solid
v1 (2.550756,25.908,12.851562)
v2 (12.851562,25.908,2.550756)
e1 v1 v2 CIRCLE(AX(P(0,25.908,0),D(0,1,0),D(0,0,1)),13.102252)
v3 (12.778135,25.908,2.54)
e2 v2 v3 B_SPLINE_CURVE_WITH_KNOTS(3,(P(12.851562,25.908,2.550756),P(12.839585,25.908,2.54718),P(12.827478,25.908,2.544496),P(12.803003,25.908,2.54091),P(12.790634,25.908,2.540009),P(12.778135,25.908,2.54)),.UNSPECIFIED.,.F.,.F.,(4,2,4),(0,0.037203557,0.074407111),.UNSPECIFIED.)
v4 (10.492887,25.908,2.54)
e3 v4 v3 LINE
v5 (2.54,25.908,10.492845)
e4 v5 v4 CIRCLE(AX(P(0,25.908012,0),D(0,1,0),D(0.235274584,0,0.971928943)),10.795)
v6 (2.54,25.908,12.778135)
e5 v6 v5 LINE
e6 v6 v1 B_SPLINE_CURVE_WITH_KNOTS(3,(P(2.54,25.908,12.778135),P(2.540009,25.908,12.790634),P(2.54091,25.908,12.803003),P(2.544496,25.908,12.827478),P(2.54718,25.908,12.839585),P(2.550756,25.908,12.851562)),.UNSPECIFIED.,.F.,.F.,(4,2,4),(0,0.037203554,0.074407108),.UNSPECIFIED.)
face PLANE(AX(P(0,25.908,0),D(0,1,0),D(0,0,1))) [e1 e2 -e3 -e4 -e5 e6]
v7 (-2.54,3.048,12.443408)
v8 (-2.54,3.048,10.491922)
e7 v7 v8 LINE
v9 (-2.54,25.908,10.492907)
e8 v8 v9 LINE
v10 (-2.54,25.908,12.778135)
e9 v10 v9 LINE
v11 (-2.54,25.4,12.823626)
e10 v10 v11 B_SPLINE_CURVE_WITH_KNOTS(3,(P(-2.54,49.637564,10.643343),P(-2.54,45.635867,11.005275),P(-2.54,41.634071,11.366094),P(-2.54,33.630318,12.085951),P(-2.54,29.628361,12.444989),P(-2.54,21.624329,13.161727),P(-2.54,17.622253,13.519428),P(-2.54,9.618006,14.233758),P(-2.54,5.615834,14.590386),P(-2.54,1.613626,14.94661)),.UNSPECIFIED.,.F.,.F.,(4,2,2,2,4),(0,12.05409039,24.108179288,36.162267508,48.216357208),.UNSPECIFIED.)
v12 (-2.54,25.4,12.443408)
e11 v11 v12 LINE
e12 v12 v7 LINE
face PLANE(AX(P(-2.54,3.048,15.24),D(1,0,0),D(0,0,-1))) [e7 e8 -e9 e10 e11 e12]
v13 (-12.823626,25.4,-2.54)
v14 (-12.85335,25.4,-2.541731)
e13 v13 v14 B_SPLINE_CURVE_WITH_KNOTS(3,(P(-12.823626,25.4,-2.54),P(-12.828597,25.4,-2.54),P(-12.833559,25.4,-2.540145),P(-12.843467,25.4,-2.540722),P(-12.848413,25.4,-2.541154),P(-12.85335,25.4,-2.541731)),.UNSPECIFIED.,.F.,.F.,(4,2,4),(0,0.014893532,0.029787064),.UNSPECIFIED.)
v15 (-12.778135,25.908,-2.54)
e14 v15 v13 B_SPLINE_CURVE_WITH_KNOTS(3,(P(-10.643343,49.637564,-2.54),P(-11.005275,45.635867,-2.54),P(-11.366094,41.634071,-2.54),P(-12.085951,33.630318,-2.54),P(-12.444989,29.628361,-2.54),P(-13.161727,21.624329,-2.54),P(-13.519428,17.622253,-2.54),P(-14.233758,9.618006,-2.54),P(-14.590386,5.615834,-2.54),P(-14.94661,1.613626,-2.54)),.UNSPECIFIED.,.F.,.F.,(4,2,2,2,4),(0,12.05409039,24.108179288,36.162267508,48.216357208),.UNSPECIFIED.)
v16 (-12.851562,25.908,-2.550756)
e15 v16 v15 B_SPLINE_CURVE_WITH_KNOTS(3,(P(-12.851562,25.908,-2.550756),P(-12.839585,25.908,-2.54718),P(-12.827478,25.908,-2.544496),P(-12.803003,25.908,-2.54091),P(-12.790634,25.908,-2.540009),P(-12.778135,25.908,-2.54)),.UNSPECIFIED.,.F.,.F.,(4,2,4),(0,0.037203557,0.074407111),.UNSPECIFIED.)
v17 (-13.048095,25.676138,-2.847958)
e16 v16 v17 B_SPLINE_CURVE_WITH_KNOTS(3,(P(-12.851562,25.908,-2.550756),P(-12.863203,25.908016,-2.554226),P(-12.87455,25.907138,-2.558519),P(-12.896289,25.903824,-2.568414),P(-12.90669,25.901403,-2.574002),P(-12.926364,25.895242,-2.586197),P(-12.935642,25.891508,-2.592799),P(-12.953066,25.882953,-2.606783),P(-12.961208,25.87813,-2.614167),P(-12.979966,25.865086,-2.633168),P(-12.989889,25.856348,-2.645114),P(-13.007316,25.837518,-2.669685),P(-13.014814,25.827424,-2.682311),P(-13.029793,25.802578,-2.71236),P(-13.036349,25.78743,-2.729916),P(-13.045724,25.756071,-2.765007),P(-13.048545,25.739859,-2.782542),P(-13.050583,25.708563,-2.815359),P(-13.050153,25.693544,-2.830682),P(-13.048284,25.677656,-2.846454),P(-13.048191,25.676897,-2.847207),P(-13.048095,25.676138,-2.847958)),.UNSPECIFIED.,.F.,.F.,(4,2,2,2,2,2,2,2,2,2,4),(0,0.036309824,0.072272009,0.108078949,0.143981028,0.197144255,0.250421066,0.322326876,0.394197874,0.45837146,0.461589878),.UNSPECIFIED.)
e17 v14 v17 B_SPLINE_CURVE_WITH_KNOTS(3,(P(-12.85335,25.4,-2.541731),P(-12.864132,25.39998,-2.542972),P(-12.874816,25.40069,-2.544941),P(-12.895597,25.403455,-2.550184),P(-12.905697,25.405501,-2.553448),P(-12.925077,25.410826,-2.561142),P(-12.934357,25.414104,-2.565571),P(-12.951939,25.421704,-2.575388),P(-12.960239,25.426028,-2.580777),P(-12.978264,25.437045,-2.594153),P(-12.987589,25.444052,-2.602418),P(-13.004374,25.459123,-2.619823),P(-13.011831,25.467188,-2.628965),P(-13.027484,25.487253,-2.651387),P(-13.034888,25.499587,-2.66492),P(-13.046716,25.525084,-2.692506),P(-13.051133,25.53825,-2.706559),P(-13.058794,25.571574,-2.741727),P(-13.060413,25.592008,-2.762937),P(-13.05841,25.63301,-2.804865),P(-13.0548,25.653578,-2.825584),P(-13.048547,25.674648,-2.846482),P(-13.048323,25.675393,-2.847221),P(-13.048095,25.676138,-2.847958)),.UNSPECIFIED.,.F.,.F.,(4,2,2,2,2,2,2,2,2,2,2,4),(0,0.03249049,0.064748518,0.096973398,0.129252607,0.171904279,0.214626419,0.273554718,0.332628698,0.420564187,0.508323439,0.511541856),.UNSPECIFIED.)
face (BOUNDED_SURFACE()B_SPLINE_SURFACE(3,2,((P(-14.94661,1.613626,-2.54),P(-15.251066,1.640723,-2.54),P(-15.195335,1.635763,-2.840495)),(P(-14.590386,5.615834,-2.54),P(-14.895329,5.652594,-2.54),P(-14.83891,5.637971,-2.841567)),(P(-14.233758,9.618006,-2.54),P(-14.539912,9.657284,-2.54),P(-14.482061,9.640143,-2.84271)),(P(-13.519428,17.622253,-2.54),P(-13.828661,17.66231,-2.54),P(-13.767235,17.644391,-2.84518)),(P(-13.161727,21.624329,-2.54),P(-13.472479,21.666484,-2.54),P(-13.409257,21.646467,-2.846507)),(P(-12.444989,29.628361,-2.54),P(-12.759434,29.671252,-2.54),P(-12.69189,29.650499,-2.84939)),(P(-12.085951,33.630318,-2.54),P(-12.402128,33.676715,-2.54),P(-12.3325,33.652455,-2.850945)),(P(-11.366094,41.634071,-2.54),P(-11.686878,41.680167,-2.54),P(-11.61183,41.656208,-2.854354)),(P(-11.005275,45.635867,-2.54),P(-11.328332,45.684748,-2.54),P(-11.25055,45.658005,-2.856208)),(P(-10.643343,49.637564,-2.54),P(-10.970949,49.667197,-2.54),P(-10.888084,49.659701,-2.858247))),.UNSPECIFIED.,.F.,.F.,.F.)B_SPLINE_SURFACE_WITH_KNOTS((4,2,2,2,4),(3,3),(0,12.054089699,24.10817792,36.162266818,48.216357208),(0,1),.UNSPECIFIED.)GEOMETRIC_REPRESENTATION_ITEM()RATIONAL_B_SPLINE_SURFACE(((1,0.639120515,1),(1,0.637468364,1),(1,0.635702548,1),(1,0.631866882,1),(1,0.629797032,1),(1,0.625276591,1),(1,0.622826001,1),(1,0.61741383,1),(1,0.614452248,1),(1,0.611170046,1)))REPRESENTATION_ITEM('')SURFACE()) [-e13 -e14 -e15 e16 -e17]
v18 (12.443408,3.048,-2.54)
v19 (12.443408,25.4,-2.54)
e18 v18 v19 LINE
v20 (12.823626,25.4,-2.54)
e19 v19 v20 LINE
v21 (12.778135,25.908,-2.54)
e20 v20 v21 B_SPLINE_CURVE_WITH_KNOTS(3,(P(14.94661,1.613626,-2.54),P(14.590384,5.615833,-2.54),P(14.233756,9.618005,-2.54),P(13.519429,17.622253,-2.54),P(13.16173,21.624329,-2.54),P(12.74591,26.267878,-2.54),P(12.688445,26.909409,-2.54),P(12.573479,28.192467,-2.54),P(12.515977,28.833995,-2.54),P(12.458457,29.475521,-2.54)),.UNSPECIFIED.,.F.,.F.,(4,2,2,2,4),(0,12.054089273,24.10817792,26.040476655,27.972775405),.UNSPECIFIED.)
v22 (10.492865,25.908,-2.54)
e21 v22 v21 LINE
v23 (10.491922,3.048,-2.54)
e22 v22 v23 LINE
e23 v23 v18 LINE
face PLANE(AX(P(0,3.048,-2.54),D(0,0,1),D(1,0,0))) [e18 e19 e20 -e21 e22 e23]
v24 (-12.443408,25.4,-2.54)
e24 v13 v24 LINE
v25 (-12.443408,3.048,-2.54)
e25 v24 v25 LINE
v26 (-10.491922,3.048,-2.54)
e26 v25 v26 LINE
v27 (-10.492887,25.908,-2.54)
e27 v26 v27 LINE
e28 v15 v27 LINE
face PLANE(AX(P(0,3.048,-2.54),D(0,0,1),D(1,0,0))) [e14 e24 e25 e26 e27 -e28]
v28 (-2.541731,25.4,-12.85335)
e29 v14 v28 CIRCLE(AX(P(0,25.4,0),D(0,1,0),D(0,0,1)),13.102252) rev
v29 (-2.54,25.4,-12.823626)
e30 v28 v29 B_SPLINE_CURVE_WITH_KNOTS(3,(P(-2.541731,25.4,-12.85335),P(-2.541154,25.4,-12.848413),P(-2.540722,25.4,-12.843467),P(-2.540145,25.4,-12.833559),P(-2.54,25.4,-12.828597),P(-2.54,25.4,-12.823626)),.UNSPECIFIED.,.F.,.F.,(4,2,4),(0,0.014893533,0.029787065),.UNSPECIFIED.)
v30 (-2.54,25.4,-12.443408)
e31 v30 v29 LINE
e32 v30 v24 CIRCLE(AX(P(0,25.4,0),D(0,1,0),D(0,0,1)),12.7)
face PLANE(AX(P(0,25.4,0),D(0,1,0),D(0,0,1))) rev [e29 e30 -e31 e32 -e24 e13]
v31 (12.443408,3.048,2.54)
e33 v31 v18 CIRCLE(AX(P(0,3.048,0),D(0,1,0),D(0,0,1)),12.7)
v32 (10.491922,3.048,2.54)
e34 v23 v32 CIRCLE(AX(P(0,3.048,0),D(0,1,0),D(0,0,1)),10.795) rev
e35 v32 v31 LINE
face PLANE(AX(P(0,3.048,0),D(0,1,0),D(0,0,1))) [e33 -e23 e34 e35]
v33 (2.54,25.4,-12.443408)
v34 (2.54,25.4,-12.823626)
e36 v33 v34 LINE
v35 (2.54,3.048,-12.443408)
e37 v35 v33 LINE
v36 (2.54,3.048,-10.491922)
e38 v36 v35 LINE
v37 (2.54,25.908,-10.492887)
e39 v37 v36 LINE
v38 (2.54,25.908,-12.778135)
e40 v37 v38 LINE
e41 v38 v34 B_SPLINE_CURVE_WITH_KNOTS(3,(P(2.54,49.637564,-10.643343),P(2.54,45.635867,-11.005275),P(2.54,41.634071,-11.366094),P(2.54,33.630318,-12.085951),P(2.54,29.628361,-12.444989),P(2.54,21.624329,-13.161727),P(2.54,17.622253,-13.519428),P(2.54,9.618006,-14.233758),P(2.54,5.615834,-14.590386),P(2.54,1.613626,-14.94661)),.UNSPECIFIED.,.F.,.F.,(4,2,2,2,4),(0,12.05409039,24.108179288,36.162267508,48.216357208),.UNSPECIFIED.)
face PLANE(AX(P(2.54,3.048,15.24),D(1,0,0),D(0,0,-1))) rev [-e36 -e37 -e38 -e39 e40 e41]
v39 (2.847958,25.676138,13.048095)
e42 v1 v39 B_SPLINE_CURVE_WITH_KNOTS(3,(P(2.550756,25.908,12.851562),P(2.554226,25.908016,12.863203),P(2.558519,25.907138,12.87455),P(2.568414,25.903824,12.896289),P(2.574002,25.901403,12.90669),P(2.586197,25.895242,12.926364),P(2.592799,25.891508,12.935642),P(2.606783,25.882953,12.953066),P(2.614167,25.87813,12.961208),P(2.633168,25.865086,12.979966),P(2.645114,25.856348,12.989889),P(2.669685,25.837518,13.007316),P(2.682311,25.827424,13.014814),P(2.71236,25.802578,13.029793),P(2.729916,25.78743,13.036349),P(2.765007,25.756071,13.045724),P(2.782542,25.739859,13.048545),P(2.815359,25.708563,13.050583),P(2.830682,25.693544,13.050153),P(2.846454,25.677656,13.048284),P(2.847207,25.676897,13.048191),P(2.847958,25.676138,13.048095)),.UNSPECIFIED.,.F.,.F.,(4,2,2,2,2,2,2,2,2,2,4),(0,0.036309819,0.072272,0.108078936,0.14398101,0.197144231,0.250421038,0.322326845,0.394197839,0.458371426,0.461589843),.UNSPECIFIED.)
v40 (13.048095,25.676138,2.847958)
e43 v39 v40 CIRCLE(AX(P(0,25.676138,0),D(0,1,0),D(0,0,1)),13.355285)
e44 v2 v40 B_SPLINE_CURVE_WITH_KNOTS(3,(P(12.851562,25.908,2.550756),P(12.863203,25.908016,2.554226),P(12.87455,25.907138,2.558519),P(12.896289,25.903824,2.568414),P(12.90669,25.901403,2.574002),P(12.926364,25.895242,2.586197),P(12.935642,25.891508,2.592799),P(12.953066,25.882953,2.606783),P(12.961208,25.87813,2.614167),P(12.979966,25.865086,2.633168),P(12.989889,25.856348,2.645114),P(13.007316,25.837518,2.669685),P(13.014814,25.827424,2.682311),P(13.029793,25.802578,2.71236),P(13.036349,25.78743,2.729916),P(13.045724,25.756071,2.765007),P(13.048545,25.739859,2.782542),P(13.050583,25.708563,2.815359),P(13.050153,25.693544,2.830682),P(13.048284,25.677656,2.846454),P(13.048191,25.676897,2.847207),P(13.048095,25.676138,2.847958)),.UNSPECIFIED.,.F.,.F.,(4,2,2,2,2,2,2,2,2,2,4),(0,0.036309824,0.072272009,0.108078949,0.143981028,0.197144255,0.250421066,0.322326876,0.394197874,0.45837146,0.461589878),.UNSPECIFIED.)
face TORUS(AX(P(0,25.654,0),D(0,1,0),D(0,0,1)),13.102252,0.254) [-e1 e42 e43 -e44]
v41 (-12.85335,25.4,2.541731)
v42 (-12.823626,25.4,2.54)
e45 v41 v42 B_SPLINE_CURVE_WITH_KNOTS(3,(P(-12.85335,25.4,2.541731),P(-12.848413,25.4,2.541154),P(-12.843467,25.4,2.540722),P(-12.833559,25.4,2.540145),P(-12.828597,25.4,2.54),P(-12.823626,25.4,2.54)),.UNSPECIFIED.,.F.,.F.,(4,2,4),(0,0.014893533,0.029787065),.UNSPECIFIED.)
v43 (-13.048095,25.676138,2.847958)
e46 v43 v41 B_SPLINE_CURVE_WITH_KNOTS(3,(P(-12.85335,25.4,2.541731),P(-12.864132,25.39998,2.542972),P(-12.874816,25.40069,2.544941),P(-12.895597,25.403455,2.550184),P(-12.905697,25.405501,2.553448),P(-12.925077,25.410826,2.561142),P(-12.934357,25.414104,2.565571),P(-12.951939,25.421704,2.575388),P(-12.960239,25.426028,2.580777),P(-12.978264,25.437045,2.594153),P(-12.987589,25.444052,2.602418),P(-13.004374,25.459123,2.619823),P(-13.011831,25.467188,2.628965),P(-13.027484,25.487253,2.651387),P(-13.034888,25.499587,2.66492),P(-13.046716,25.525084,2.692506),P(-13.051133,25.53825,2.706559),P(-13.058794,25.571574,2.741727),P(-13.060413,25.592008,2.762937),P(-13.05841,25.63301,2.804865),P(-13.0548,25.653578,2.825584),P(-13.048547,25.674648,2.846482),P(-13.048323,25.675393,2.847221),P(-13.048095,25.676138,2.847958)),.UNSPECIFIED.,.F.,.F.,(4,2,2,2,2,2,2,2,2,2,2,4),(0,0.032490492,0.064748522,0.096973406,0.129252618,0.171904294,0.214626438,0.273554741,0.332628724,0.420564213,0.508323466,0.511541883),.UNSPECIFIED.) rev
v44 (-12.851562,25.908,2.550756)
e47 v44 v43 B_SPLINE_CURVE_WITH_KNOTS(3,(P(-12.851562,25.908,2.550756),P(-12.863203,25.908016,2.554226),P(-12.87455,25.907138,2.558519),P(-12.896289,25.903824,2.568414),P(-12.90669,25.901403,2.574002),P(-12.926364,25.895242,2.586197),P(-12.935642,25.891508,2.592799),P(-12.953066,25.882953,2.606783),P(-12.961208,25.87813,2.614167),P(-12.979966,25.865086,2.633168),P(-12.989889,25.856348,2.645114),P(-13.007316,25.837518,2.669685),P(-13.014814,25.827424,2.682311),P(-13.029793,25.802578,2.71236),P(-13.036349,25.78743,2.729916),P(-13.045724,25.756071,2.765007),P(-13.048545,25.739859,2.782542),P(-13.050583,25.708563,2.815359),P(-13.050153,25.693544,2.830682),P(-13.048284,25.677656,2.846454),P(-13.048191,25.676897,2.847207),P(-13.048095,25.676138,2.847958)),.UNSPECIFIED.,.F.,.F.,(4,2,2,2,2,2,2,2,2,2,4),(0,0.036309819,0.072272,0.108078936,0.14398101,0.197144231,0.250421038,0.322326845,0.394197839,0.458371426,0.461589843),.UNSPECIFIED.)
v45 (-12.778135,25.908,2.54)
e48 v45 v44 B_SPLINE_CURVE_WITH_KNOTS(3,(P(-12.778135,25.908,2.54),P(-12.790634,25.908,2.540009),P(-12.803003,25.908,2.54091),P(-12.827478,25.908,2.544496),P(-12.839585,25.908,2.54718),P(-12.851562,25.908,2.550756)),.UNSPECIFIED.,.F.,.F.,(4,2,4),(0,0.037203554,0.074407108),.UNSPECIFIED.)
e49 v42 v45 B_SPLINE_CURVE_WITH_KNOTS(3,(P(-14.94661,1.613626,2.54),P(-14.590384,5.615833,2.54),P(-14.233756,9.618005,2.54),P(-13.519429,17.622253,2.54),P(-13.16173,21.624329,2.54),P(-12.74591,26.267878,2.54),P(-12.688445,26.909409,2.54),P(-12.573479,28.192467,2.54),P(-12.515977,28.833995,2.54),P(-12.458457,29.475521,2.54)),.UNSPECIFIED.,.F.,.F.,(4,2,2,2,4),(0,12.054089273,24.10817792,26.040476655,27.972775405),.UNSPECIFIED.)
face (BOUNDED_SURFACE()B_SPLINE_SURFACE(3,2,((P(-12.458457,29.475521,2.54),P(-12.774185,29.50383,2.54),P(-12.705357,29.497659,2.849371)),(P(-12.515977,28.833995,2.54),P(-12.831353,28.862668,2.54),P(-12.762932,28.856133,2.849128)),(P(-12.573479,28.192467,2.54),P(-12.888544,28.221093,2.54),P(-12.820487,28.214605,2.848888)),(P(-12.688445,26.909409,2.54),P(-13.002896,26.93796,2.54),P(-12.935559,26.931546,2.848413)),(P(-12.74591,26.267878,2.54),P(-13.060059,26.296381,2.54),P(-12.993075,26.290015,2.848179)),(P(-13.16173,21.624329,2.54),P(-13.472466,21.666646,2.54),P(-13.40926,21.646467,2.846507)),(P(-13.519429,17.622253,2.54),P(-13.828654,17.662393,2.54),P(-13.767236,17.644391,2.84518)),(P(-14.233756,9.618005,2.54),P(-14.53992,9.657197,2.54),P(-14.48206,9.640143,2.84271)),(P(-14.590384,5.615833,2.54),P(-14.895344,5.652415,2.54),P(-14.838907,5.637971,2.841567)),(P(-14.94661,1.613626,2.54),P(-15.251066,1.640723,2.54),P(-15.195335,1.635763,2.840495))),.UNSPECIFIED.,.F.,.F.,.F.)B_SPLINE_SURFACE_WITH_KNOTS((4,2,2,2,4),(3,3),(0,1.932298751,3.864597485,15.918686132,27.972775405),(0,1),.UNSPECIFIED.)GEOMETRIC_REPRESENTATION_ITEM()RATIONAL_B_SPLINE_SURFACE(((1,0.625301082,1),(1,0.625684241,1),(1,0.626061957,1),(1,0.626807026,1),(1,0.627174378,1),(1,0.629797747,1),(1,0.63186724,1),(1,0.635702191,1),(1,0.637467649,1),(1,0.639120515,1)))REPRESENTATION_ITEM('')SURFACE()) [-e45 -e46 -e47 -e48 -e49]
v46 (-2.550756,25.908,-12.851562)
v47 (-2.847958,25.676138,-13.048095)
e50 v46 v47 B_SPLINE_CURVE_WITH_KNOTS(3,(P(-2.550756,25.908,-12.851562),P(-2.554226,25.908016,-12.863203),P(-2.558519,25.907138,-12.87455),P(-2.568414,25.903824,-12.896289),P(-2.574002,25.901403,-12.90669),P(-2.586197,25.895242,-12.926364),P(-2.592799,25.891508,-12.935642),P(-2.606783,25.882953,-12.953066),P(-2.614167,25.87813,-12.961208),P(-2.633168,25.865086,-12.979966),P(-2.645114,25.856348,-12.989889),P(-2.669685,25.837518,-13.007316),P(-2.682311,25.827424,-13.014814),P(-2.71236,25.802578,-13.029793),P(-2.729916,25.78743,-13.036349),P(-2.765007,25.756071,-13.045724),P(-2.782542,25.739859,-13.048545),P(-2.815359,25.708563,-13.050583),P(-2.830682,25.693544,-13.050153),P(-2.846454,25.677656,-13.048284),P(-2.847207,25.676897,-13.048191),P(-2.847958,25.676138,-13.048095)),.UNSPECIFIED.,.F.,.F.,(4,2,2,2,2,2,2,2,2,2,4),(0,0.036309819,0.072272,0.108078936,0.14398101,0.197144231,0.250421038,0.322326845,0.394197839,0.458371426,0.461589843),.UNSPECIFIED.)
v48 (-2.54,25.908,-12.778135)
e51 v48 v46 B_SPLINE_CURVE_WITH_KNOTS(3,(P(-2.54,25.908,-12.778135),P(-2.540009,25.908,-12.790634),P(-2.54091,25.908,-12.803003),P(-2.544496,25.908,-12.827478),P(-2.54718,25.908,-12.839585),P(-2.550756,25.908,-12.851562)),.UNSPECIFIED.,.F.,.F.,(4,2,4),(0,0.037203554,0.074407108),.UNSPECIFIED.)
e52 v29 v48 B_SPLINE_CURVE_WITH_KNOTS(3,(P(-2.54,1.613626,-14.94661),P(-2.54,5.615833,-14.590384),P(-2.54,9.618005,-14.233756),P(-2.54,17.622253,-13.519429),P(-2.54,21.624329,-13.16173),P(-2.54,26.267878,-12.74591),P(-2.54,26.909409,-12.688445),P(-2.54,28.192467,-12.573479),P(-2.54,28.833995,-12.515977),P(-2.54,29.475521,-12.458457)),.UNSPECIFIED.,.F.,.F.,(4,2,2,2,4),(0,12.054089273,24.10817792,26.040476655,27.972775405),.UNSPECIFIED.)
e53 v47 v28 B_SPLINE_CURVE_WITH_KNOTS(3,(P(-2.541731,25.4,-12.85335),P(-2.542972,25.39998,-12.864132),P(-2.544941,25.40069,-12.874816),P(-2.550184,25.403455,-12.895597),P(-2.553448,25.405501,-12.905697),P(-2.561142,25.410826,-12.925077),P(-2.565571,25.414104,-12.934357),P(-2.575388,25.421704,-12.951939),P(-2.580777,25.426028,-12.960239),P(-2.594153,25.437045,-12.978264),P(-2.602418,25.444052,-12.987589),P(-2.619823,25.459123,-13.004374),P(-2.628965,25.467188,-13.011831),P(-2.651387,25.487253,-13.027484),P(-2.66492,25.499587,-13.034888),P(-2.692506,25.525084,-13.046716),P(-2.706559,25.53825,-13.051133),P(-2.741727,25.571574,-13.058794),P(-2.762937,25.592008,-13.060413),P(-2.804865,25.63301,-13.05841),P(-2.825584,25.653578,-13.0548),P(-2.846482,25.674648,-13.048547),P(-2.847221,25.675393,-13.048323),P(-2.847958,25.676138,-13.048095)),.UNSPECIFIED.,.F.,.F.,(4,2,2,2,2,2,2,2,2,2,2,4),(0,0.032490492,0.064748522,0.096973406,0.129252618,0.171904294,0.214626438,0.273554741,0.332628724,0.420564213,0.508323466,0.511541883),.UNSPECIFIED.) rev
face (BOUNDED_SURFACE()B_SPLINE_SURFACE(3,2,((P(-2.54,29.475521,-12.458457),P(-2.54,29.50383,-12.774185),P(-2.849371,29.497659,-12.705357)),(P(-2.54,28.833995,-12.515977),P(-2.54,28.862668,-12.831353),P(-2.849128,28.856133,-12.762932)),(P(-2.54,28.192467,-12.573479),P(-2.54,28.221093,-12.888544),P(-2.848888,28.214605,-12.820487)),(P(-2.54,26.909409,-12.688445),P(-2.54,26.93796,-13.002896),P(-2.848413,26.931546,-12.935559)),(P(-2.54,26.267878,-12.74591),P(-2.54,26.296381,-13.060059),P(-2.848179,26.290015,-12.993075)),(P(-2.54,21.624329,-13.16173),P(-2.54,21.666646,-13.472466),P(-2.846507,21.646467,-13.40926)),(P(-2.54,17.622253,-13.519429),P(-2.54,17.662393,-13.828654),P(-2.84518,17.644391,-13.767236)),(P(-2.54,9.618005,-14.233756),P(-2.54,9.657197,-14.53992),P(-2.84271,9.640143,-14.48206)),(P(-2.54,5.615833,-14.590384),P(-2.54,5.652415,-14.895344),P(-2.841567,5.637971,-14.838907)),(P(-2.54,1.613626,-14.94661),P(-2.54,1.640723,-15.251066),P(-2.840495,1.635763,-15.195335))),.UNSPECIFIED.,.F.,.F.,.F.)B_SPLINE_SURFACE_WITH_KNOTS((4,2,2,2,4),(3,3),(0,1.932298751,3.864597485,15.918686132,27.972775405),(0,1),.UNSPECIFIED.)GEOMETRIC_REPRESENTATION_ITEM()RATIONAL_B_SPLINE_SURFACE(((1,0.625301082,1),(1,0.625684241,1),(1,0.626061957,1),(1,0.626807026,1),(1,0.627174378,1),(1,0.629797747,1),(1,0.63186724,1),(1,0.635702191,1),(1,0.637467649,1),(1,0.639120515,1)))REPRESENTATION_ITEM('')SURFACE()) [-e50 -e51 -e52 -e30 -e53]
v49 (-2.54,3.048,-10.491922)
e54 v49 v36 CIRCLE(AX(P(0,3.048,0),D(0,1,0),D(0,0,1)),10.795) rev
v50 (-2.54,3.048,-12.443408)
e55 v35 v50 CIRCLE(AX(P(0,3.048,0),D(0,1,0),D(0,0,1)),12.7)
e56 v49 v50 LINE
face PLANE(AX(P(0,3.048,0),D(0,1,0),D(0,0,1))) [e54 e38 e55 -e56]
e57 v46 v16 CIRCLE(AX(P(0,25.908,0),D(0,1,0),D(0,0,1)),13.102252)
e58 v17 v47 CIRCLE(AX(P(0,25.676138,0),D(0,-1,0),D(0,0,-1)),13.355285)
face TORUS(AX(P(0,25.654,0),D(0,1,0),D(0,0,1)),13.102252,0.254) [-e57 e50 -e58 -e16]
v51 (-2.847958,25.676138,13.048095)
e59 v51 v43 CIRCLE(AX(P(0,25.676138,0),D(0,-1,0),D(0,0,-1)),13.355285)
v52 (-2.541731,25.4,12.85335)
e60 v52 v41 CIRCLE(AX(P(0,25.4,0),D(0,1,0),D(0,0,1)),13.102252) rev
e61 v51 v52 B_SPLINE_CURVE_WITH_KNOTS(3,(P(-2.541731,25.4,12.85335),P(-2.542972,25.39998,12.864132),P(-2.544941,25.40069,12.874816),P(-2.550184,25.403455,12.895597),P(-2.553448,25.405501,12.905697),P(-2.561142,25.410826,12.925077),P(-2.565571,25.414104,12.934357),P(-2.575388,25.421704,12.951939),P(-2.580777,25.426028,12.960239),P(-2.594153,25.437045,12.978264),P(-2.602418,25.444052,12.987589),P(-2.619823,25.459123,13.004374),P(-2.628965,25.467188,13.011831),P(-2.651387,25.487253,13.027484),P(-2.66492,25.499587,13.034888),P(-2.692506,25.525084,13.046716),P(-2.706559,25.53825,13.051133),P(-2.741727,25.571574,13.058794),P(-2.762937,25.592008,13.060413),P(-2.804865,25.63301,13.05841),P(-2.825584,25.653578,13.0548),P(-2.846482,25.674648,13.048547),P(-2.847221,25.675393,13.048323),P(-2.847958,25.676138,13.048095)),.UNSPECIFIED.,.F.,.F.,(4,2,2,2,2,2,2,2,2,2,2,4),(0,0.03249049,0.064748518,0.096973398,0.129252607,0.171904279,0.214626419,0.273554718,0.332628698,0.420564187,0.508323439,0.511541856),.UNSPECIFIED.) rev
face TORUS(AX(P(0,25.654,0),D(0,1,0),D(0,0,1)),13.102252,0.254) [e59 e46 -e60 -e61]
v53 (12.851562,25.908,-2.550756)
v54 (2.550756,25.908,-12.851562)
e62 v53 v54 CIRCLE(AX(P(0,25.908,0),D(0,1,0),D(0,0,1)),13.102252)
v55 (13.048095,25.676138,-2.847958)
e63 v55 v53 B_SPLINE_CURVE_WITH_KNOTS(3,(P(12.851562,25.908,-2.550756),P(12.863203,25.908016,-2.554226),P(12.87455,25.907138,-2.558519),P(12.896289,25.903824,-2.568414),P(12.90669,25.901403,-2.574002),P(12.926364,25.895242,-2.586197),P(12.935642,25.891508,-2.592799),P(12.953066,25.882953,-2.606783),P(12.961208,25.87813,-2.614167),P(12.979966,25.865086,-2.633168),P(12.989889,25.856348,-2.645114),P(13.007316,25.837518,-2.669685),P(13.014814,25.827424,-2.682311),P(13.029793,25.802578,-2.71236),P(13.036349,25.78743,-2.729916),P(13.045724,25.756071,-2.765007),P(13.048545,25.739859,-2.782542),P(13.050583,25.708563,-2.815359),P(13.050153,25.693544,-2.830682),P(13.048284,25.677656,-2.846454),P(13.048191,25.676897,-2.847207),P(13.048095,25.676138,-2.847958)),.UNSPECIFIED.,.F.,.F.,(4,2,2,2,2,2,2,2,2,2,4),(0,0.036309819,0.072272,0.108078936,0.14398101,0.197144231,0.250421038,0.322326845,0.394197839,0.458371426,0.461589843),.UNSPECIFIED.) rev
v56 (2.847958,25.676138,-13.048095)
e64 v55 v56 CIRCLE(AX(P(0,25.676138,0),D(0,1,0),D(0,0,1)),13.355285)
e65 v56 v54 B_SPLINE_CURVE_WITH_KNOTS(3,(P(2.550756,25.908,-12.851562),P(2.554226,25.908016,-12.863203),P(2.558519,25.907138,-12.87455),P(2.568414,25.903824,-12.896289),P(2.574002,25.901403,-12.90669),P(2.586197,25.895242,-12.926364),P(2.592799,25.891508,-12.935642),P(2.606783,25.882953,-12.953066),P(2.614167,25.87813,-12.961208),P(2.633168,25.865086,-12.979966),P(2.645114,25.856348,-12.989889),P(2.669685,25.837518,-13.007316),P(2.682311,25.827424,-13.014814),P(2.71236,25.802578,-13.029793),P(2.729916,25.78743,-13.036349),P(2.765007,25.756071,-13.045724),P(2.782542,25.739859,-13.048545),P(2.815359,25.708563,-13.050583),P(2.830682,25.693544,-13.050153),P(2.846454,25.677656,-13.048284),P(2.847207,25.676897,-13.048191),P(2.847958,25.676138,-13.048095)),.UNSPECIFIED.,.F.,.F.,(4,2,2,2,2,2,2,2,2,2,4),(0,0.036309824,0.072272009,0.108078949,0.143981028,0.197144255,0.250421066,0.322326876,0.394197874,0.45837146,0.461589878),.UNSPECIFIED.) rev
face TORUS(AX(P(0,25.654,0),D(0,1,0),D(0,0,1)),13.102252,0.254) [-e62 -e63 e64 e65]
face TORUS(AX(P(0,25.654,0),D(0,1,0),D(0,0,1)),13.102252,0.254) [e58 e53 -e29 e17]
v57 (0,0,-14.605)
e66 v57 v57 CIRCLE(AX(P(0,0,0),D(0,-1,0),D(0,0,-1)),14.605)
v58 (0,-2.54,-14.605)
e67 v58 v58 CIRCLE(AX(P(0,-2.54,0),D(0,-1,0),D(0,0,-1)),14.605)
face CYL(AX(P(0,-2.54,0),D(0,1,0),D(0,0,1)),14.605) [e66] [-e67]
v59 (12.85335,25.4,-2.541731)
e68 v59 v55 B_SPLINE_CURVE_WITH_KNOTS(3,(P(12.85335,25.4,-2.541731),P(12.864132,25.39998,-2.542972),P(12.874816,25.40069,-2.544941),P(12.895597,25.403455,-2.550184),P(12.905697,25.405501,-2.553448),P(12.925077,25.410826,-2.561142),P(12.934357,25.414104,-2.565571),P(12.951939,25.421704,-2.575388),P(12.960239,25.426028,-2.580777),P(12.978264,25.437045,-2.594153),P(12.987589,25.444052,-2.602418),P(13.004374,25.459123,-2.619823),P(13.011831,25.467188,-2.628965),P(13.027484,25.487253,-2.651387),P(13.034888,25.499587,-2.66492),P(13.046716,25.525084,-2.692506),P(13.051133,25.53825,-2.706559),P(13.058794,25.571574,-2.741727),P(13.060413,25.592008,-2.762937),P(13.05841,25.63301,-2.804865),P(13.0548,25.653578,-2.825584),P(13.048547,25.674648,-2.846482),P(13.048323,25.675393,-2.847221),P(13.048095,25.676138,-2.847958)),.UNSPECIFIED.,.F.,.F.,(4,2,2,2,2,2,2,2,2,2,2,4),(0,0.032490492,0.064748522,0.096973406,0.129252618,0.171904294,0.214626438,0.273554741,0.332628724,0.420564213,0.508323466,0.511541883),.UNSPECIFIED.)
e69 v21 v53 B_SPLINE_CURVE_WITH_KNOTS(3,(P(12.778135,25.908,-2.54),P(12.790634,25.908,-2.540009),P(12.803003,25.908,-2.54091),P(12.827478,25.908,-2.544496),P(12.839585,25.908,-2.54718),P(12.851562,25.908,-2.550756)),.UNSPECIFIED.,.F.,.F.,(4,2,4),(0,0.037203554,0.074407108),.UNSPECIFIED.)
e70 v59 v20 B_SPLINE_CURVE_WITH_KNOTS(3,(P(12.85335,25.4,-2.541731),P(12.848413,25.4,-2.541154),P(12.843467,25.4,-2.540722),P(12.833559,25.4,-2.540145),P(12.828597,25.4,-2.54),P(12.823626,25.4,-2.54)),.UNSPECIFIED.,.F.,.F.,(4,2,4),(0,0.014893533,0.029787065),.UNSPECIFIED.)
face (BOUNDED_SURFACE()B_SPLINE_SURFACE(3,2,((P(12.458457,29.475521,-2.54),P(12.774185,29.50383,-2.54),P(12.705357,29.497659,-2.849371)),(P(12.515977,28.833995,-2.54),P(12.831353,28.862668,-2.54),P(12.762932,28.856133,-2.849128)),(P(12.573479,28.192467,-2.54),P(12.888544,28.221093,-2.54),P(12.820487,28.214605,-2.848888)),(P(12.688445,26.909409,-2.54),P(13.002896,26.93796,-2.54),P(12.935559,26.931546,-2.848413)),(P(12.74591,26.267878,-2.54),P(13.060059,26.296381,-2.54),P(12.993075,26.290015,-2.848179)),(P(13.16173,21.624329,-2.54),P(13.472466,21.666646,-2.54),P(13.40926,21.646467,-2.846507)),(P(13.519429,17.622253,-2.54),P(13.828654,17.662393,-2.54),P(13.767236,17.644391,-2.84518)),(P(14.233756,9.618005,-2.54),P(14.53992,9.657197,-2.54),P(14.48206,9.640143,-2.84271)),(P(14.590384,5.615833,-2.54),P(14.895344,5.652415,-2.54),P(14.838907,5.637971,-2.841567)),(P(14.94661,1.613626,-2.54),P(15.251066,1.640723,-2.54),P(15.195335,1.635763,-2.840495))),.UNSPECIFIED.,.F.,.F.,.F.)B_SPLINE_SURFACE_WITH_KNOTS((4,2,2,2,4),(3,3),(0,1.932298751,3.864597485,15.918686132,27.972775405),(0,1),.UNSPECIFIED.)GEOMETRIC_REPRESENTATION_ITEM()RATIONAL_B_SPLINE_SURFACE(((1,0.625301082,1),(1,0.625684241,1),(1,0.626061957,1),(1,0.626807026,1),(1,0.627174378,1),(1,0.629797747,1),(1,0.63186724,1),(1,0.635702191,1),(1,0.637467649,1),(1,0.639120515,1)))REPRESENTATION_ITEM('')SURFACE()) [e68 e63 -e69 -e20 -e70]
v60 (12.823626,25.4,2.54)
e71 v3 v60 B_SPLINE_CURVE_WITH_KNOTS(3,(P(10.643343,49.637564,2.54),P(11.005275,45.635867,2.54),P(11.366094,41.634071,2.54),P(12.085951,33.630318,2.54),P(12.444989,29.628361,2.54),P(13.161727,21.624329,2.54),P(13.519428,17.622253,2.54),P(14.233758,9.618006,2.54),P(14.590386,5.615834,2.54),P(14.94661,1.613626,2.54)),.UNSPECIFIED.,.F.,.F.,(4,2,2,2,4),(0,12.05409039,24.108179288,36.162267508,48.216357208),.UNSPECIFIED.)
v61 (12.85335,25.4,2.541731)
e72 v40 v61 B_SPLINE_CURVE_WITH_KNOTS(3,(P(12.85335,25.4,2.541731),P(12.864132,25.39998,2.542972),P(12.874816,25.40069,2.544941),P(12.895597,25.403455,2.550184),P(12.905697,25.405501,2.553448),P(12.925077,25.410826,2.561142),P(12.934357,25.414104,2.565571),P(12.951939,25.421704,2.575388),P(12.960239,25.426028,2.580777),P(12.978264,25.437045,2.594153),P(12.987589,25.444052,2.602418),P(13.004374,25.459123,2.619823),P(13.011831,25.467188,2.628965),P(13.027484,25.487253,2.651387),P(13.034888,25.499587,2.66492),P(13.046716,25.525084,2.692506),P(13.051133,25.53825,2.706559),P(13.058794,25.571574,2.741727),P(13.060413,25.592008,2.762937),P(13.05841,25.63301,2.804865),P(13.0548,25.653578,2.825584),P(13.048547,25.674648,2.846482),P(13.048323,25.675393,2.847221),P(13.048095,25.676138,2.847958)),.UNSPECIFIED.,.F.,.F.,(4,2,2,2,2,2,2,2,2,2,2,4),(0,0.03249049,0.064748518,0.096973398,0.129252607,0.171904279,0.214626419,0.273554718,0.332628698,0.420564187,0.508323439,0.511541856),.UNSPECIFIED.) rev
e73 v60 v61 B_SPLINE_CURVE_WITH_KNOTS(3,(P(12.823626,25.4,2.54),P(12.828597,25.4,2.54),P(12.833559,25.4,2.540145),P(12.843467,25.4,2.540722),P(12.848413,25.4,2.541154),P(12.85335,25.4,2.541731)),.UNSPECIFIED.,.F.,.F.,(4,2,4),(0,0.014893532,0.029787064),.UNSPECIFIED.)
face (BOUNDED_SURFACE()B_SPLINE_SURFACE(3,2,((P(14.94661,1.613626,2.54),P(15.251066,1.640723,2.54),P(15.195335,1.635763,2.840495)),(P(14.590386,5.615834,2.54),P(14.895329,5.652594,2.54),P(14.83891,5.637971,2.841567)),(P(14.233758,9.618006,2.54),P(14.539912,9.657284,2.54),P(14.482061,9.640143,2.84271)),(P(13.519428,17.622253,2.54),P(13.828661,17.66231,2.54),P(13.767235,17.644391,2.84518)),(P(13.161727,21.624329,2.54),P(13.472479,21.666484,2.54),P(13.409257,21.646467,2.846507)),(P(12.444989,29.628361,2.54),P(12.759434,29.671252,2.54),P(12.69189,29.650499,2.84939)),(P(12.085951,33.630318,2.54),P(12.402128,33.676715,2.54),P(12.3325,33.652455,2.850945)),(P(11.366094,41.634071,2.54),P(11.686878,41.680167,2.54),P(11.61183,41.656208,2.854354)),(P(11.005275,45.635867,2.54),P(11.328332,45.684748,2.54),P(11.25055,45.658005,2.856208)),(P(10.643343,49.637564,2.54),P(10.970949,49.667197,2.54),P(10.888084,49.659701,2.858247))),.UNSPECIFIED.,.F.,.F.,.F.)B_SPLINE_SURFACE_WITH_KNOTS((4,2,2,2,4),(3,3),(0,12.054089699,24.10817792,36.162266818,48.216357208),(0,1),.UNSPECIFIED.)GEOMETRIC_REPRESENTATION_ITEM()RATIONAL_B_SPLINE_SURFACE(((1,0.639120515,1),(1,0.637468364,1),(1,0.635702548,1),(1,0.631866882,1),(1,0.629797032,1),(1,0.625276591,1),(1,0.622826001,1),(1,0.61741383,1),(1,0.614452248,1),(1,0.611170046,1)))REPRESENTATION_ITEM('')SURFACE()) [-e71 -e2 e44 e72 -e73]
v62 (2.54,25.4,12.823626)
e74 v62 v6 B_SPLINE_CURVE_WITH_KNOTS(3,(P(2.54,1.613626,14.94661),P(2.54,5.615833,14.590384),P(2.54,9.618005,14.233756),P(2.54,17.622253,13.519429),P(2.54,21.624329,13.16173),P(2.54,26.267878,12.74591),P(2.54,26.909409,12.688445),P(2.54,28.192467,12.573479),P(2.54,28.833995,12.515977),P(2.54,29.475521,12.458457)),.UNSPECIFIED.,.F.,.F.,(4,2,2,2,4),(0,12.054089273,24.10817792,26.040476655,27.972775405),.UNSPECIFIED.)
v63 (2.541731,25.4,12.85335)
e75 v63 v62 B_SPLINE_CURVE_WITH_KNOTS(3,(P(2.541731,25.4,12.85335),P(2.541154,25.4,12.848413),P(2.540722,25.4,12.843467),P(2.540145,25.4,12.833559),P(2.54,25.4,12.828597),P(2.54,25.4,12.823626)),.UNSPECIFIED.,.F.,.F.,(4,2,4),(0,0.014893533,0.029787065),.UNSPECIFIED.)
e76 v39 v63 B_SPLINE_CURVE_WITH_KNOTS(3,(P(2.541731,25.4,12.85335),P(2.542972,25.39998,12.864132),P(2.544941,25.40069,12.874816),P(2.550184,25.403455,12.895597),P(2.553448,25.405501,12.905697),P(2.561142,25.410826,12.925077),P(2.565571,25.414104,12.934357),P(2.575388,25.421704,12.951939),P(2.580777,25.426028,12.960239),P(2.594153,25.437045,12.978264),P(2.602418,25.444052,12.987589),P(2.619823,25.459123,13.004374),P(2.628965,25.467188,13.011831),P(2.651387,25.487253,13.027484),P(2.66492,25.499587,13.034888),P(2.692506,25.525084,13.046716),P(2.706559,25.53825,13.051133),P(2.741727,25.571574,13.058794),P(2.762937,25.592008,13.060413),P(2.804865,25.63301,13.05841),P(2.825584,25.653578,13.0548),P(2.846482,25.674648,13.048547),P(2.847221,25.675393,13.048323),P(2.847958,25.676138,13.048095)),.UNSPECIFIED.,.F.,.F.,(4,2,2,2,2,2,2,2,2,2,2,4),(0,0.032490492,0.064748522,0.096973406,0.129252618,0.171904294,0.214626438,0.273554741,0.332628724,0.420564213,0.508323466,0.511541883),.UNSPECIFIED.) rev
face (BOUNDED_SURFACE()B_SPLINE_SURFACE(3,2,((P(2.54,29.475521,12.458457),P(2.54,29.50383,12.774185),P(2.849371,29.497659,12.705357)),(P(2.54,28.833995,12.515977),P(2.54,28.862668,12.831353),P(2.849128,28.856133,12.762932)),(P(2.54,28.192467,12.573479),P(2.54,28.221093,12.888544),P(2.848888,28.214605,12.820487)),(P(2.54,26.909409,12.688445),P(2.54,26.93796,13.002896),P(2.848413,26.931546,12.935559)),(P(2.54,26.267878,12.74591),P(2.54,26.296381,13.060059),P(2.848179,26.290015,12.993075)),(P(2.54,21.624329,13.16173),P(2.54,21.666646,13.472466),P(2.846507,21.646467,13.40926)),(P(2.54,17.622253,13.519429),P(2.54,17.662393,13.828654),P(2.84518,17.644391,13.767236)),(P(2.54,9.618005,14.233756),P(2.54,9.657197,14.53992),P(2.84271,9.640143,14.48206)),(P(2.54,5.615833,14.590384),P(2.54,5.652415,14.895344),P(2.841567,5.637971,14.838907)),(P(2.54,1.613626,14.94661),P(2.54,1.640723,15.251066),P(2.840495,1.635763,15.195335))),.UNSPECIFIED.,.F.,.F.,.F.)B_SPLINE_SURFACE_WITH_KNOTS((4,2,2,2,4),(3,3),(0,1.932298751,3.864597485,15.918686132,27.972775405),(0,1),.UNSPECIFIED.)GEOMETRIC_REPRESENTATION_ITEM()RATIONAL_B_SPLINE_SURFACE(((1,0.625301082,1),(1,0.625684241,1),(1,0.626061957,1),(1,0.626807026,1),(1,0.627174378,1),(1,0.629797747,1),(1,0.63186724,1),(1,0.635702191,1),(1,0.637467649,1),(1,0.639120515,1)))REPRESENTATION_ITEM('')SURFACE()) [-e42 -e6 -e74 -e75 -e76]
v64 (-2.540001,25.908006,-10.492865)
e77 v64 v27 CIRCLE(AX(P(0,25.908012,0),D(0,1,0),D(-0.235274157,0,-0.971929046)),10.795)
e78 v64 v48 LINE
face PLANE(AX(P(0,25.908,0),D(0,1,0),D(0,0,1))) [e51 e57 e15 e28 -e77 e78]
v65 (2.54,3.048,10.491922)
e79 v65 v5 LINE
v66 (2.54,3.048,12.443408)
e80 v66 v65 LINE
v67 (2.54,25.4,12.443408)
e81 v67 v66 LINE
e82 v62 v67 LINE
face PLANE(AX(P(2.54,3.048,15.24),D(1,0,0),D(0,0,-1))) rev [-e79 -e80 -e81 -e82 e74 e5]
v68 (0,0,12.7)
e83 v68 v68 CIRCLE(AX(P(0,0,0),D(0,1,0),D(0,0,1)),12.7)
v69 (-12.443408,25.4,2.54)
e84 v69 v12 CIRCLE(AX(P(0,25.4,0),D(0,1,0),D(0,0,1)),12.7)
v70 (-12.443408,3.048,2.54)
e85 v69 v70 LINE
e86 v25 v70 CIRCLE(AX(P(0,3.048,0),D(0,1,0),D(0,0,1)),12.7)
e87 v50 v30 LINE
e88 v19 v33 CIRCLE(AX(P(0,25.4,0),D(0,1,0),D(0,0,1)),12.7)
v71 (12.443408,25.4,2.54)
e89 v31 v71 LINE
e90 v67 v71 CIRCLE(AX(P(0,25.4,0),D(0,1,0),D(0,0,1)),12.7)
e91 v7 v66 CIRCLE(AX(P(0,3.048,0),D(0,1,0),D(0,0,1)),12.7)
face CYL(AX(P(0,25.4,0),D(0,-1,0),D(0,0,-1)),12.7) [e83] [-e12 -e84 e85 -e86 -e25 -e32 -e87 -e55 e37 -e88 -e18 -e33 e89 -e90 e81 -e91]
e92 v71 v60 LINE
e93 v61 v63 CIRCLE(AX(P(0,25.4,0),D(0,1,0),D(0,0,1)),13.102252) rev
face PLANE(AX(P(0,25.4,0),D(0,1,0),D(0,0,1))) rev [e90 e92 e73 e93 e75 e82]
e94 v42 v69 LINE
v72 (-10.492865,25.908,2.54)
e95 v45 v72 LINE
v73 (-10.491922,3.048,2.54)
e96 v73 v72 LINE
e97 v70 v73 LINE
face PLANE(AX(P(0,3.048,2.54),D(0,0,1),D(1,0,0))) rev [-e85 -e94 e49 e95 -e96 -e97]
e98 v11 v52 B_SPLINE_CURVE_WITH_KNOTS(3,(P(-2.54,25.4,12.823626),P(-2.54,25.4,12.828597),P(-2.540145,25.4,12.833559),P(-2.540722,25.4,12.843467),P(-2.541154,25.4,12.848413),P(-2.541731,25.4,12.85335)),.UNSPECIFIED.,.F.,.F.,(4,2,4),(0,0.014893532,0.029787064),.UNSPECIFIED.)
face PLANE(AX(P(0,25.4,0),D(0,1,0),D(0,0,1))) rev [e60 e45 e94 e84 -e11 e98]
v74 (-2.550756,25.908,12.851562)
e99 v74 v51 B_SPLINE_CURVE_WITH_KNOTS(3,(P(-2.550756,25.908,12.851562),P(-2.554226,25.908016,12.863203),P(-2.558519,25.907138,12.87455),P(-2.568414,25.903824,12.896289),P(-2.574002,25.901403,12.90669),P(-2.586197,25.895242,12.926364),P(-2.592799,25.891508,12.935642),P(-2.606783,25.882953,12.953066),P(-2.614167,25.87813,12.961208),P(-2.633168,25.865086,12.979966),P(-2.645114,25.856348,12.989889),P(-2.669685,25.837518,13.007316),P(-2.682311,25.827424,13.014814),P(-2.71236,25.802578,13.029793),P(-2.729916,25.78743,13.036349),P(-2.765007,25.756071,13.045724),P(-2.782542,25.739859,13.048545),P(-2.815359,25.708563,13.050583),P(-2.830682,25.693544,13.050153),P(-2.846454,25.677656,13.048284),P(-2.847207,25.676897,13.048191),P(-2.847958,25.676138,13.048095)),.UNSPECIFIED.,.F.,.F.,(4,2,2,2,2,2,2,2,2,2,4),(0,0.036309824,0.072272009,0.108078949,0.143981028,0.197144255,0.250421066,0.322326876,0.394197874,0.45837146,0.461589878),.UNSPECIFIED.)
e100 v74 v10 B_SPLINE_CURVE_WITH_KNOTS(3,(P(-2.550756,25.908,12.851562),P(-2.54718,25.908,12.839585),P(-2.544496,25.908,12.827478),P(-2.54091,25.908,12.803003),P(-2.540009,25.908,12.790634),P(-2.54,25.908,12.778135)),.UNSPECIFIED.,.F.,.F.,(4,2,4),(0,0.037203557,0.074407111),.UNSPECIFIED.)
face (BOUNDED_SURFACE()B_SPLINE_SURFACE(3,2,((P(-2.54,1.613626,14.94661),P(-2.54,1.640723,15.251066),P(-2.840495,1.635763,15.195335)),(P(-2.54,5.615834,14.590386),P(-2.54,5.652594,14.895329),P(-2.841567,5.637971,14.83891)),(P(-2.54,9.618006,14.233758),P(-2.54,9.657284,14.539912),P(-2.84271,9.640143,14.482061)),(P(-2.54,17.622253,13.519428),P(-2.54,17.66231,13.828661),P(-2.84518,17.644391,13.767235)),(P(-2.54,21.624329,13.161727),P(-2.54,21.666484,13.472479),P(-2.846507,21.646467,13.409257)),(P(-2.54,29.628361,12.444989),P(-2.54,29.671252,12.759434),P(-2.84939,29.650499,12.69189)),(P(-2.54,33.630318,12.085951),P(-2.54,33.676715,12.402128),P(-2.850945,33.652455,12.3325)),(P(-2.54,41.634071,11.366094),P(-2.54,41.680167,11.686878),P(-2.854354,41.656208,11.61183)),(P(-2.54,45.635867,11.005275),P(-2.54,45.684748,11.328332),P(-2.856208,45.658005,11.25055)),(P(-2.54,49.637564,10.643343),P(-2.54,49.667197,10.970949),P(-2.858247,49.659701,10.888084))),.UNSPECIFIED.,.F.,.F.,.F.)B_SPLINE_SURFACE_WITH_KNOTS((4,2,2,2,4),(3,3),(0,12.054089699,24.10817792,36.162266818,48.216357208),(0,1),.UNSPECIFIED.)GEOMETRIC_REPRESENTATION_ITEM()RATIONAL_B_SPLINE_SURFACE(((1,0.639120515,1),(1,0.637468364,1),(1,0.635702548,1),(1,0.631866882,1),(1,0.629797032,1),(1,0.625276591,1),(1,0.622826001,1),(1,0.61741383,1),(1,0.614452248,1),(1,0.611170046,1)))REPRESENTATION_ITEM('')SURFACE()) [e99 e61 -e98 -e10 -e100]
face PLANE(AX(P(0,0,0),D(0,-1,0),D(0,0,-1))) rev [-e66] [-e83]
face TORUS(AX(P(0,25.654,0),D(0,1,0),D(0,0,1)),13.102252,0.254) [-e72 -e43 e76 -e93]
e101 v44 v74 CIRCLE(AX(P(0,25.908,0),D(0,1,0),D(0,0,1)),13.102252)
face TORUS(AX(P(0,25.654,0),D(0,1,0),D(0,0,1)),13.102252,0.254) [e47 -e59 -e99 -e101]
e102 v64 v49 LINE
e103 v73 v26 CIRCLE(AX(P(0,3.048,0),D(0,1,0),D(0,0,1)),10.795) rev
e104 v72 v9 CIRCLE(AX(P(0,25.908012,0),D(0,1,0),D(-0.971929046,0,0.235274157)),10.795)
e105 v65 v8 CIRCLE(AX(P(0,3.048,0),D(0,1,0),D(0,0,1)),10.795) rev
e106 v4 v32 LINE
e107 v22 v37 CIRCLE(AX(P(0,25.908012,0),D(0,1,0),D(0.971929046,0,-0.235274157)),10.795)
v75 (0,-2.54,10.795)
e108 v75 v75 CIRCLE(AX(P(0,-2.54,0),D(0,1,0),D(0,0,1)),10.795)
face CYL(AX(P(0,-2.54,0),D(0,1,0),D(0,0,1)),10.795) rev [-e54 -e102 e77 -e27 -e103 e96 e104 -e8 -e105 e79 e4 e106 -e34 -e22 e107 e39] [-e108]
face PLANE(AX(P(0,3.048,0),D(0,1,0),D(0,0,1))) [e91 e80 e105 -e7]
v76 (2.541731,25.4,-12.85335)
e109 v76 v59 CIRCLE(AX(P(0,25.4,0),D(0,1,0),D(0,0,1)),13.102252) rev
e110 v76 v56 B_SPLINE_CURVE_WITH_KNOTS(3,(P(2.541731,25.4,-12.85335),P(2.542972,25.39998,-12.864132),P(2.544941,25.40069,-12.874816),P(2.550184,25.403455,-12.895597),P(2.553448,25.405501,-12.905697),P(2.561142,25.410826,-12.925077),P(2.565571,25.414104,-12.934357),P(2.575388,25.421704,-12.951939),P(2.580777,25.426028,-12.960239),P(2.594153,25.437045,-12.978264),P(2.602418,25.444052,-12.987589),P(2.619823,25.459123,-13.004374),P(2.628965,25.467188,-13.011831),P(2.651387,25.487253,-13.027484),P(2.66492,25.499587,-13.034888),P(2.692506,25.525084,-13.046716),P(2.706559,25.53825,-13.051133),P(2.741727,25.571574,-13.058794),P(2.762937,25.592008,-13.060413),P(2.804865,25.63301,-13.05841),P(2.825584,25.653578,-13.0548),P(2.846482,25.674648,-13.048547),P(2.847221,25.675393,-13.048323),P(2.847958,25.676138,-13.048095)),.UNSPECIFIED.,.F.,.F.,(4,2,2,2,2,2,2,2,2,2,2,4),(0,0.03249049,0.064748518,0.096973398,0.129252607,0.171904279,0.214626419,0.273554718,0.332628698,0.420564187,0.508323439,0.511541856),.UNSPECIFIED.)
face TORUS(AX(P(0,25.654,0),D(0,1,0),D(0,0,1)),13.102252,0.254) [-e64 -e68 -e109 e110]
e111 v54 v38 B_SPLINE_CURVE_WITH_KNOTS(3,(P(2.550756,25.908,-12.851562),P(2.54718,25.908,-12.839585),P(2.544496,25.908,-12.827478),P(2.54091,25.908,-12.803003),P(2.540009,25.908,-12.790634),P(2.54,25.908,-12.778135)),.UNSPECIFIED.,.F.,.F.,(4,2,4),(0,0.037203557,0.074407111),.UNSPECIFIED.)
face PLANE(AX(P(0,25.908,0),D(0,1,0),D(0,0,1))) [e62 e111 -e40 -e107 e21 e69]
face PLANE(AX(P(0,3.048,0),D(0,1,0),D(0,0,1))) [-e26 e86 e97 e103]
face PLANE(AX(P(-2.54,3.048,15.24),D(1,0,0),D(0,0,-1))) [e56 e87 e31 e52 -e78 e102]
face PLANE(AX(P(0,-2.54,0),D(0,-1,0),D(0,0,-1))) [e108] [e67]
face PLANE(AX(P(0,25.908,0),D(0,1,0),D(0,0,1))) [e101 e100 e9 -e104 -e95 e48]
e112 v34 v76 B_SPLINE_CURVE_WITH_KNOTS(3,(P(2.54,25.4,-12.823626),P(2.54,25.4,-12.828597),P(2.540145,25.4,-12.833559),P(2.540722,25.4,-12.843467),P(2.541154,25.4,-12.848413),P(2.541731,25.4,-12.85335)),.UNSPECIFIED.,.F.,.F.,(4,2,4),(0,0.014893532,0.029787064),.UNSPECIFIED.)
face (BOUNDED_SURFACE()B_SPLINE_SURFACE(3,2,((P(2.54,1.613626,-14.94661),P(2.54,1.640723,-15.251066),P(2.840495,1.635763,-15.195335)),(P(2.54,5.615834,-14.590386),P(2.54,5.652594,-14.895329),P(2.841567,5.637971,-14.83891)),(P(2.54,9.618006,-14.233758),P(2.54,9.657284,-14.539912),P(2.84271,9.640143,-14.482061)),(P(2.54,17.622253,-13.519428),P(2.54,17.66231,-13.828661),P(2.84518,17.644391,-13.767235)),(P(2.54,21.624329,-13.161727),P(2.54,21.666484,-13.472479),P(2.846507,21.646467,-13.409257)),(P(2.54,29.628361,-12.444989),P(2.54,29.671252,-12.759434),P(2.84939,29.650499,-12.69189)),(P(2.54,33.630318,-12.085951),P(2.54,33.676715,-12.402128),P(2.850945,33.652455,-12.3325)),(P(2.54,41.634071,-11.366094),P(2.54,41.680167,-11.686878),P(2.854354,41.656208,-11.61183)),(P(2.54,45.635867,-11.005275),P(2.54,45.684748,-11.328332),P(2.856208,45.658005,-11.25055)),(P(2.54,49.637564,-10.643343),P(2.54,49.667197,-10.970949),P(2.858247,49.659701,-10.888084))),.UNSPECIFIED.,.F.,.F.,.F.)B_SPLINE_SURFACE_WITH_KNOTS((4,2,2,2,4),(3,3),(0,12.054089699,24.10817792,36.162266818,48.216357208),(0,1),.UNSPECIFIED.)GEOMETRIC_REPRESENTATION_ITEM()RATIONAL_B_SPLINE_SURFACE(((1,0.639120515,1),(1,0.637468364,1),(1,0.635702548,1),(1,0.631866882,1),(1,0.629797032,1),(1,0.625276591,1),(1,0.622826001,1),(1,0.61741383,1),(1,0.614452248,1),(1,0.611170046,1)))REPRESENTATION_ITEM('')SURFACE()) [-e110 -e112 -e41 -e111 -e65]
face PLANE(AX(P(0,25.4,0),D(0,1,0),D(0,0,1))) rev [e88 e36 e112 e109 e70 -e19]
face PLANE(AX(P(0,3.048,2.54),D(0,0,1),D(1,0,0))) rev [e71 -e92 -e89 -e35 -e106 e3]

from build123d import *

# Parameters (mm, degrees)
SKETCH1_R               = 12.7
BOSS_EXTRUDE1_DEPTH     = 25.4
SKETCH2_R               = 13.335
BOSS_EXTRUDE2_DEPTH     = 0.508
DRAFT1_ANGLE            = 5
SKETCH5_R               = 14.605
BOSS_EXTRUDE3_DEPTH     = 2.54
CUT_EXTRUDE1_DEPTH      = 36.155380157
CUT_EXTRUDE1_DEPTH_BACK = 36.155380157
SKETCH3_R               = 10.795
SKETCH4_W               = 30.48
SKETCH4_H               = 5.08
SKETCH4_W_2             = 5.08
SKETCH4_H_2             = 30.48
CUT_EXTRUDE2_DEPTH      = 22.86
FILLET3_R               = 0.254


with BuildPart() as part:
    # Sketch1 → Boss-Extrude1 (new body)
    with BuildSketch(Plane(origin=(0, 0, 0), x_dir=(1, 0, 0), z_dir=(0, 1, 0))):
        with Locations(Location((0, 0, 0), (0, 0, 270))):
            Circle(SKETCH1_R)
    extrude(amount=BOSS_EXTRUDE1_DEPTH)

    # Sketch2 → Boss-Extrude2 (add)
    with BuildSketch(Plane(origin=(0, 25.4, 0), x_dir=(1, 0, 0), z_dir=(0, 1, 0))):
        with Locations(Location((0, 0, 0), (0, 0, 270))):
            Circle(SKETCH2_R)
    extrude(amount=BOSS_EXTRUDE2_DEPTH)

    # Draft1
    draft1_faces = [part.faces().sort_by_distance(p)[0] for p in [
        (0, 25.654, -13.335),
    ]]
    draft(draft1_faces, Plane.ZX.offset(25.908), DRAFT1_ANGLE)

    # Sketch5 → Boss-Extrude3 (add)
    with BuildSketch(Plane.XZ):
        with Locations(Location((0, 0, 0), (0, 0, 270))):
            Circle(SKETCH5_R)
    extrude(amount=BOSS_EXTRUDE3_DEPTH)

    # Sketch3 → Cut-Extrude1 (cut, two sides: drawn at the far end of the back side and taken through both)
    with BuildSketch(Plane(origin=(0, 25.908, 0), x_dir=(1, 0, 0), z_dir=(0, 1, 0)).offset(-CUT_EXTRUDE1_DEPTH_BACK)):
        with Locations(Location((0, 0, 0), (0, 0, 270))):
            Circle(SKETCH3_R)
    extrude(amount=CUT_EXTRUDE1_DEPTH + CUT_EXTRUDE1_DEPTH_BACK, mode=Mode.SUBTRACT)

    # Sketch4 → Cut-Extrude2 (cut)
    with BuildSketch(Plane(origin=(0, 25.908, 0), x_dir=(1, 0, 0), z_dir=(0, 1, 0))):
        Rectangle(SKETCH4_W, SKETCH4_H)
        Rectangle(SKETCH4_W_2, SKETCH4_H_2)
    extrude(amount=-CUT_EXTRUDE2_DEPTH, mode=Mode.SUBTRACT)

    # Fillet3
    fillet3_edges = [part.edges().sort_by_distance(p)[0] for p in [
        (-2.54, 25.654219214, -13.113476672),
        (-2.54, 25.654219214, 13.113476672),
        (-9.460695751, 25.4, 9.460695751),
        (-13.113476672, 25.654219214, 2.54),
        (13.113476672, 25.654219214, 2.54),
        (-9.429268927, 25.908, 9.429268927),
        (-9.460695751, 25.4, -9.460695751),
        (-9.429268927, 25.908, -9.429268927),
        (-13.113476672, 25.654219214, -2.54),
        (13.113476672, 25.654219214, -2.54),
        (9.429268927, 25.908, -9.429268927),
        (2.54, 25.654219214, -13.113476672),
        (2.54, 25.654219214, 13.113476672),
        (9.460695751, 25.4, -9.460695751),
        (9.460695751, 25.4, 9.460695751),
        (9.429268927, 25.908, 9.429268927),
    ]]
    fillet(fillet3_edges, radius=FILLET3_R - 0.0001)  # a hair under: the kernel refuses the full size


solid = part.part
